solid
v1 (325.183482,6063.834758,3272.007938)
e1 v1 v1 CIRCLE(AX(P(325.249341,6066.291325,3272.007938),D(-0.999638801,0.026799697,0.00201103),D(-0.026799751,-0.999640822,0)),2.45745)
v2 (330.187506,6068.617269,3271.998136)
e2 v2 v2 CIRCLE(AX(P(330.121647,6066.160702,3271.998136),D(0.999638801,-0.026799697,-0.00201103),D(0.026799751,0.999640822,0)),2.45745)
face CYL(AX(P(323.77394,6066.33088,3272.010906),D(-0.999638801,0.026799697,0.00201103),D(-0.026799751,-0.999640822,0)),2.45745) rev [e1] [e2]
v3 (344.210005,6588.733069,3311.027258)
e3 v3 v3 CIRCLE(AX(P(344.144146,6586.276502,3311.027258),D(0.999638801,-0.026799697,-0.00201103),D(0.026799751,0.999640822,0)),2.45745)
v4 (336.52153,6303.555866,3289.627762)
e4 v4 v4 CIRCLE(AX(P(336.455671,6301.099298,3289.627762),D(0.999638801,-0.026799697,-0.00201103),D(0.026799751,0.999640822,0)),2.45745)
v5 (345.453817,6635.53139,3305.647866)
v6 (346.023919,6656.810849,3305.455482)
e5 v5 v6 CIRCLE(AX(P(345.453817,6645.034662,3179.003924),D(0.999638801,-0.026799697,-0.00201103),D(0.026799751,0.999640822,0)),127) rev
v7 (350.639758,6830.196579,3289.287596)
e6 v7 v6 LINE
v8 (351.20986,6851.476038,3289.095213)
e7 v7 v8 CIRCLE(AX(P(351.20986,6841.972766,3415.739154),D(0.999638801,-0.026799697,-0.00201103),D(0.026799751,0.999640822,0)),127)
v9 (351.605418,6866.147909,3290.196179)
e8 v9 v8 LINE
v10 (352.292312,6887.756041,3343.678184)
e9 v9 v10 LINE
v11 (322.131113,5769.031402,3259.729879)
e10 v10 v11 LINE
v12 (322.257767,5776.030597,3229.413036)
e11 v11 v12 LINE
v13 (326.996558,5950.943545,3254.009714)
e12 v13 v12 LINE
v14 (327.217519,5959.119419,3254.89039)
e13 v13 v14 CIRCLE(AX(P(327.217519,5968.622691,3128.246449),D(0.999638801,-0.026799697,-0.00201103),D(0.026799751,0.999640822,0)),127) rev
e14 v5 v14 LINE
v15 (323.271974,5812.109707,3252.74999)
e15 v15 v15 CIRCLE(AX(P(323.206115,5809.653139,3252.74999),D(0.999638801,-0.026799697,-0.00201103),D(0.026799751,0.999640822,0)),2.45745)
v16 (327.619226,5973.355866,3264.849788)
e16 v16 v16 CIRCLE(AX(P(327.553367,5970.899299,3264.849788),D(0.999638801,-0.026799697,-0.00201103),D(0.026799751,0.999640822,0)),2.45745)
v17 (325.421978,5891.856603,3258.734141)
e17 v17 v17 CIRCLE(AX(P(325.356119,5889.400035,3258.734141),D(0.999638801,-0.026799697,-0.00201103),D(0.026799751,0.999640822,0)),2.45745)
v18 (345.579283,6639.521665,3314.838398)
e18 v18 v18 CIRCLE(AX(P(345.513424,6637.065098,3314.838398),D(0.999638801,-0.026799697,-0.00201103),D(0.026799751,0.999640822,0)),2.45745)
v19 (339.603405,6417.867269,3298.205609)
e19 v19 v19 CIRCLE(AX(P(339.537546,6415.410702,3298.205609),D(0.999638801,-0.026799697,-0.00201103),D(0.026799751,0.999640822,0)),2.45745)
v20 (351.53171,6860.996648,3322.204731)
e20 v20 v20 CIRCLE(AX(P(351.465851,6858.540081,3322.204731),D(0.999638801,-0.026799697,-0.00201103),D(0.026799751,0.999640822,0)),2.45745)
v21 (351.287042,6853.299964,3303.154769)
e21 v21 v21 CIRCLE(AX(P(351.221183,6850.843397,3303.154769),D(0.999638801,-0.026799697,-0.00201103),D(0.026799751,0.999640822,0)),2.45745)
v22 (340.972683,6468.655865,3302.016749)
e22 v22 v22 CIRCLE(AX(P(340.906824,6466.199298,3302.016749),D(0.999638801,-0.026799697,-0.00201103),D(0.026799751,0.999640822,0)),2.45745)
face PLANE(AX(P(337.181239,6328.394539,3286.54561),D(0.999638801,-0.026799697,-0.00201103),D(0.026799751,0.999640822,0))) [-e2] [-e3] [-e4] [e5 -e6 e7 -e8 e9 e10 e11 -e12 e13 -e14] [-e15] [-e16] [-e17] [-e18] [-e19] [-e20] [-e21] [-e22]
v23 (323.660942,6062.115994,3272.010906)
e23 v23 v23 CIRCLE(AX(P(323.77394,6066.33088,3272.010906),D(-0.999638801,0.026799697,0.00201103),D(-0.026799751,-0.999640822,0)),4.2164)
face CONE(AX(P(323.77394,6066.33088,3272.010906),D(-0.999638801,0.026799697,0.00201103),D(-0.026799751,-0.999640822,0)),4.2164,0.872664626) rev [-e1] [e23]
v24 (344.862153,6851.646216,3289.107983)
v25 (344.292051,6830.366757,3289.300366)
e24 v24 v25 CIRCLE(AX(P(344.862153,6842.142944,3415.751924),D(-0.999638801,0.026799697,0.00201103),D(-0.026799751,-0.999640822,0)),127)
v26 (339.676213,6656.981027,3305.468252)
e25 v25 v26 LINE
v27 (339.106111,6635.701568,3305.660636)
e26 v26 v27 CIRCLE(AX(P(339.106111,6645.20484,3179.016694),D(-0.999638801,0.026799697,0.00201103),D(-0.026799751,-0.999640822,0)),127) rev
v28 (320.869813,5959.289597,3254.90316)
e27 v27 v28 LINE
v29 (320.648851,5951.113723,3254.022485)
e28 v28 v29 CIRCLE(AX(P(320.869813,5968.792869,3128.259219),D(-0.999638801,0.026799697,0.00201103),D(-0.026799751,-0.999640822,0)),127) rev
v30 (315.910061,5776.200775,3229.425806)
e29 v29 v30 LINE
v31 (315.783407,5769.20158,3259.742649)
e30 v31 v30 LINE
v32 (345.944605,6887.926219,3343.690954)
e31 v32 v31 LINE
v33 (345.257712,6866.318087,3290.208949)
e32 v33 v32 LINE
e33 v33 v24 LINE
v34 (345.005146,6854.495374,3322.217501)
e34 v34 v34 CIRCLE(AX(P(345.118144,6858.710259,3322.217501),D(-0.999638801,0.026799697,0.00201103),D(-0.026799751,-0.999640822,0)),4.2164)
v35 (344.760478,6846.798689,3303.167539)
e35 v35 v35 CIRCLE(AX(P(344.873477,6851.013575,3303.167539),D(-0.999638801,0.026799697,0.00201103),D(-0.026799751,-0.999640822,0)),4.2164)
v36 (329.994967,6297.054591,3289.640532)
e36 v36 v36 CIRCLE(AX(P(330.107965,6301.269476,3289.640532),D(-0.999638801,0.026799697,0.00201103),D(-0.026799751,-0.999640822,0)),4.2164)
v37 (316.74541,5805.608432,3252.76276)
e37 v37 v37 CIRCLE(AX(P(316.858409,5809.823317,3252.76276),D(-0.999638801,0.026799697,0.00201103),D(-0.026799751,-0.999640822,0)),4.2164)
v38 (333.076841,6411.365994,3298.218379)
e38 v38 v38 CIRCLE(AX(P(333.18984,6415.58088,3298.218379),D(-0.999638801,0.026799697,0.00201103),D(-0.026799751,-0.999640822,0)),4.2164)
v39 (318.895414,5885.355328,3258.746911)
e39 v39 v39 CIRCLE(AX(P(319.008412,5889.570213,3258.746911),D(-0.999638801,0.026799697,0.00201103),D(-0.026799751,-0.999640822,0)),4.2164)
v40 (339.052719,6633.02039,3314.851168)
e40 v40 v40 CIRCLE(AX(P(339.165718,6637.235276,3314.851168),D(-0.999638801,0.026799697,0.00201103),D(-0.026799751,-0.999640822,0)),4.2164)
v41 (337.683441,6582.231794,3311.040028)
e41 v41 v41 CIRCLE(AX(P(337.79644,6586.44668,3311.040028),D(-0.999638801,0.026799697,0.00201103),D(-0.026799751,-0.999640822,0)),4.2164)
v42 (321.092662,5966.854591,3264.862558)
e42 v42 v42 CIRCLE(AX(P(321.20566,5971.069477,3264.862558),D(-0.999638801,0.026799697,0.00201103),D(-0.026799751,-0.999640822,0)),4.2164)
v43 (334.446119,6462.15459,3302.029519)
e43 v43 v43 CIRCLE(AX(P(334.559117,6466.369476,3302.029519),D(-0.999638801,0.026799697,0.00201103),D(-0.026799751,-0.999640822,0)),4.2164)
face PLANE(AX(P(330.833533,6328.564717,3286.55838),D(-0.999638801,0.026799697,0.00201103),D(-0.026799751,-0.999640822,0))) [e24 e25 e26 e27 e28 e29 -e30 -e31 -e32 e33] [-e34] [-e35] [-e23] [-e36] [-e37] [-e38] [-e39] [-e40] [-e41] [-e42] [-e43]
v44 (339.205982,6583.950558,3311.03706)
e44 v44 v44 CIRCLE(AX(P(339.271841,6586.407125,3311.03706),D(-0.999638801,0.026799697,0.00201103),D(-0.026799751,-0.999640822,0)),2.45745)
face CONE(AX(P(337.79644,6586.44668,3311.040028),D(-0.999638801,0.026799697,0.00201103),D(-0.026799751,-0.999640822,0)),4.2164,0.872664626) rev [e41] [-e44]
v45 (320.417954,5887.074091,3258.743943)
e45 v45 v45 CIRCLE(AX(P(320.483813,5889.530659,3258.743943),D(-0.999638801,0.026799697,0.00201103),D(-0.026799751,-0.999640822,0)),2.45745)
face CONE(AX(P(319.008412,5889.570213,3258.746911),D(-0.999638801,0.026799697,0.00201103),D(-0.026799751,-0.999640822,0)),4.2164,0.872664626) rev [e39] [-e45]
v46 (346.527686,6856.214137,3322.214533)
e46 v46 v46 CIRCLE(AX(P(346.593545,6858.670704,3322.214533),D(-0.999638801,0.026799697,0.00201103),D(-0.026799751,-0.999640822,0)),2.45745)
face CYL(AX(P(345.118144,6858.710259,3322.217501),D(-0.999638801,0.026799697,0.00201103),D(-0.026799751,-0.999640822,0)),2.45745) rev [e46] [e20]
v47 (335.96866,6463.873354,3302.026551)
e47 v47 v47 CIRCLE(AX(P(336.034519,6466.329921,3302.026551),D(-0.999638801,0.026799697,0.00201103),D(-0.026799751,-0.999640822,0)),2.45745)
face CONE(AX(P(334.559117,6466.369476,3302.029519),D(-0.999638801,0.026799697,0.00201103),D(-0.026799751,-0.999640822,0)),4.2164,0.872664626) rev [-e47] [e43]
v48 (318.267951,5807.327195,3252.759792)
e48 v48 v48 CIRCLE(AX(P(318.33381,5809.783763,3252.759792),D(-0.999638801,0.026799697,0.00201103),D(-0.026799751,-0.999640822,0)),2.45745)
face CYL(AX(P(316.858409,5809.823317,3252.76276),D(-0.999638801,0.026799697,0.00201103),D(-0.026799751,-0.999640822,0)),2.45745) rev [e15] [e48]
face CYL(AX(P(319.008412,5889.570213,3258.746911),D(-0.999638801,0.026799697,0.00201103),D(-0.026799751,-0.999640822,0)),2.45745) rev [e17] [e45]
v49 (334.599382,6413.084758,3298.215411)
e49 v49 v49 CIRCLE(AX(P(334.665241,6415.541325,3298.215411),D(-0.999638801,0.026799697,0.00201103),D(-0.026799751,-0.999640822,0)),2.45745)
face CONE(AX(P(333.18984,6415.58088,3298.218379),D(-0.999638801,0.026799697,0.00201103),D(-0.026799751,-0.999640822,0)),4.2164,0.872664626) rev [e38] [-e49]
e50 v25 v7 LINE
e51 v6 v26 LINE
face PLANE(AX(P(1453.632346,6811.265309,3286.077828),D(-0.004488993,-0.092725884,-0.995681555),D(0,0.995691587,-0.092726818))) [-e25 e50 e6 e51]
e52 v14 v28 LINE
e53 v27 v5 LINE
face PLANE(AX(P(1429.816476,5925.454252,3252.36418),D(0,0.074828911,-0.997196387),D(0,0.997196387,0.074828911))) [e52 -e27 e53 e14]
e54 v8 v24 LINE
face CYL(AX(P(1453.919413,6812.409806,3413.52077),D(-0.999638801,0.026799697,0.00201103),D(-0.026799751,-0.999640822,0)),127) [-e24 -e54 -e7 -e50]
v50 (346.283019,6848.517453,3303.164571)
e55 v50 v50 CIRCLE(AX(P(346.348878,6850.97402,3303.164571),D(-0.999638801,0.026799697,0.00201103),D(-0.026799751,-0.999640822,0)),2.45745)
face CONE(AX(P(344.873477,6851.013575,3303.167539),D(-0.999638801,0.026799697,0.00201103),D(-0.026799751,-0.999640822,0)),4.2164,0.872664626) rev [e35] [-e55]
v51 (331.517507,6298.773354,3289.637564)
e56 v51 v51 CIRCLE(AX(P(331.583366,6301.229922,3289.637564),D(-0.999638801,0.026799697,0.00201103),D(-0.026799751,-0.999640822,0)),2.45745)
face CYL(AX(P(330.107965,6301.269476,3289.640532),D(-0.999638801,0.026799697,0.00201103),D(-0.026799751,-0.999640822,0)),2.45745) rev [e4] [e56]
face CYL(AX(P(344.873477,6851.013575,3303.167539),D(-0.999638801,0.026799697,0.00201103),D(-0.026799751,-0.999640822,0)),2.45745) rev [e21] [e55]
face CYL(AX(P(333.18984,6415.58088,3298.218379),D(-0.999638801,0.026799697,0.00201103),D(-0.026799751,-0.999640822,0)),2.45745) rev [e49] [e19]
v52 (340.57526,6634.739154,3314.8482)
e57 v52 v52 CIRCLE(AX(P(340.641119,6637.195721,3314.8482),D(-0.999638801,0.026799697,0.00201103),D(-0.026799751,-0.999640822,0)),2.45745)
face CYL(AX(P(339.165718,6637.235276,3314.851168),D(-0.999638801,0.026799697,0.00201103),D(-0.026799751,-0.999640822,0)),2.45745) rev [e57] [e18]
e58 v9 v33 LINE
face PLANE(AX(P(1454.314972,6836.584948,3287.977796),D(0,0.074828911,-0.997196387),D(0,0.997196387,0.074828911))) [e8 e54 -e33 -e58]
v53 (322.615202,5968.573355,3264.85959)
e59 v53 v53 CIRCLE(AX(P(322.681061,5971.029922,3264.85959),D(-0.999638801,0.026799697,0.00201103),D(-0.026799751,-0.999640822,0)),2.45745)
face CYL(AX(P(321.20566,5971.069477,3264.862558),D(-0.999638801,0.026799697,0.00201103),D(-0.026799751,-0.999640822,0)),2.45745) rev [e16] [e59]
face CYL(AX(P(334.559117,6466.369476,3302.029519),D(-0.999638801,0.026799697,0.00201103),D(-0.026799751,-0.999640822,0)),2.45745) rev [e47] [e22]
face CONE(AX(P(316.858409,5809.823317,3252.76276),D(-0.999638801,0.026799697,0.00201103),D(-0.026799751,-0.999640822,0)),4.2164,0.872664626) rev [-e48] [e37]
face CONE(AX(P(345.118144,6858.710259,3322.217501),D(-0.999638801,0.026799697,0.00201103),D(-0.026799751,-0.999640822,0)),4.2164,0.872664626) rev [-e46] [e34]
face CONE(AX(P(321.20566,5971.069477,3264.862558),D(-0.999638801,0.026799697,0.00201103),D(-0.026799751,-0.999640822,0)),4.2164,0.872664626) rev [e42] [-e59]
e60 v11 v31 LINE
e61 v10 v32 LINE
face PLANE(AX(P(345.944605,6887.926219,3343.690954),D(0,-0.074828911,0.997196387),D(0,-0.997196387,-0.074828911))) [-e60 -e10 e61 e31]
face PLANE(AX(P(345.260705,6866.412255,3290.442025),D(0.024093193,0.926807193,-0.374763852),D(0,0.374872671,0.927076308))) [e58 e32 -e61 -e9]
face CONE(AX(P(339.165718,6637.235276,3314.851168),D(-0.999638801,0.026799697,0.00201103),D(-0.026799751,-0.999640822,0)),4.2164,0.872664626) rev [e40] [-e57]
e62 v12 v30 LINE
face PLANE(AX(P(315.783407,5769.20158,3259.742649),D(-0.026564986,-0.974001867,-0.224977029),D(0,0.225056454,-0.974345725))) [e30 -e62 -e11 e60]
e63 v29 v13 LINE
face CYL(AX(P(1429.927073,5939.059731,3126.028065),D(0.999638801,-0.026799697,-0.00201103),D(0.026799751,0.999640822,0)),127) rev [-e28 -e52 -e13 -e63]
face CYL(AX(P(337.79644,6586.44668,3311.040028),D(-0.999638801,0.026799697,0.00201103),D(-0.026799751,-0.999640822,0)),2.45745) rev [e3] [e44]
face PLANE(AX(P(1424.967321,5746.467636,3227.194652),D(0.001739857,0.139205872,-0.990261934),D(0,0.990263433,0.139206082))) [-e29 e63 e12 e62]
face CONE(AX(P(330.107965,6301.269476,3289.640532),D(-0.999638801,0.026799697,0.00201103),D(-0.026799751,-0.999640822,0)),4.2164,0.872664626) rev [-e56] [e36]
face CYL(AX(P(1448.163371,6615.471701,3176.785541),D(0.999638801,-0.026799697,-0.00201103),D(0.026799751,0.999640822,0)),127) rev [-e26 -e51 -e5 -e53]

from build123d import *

# Parameters (mm, degrees)
STOCK_LEFT_START                                  = 154.501049255
STOCK_LEFT_CONSOLE_1_OUTLINE_R                    = 2.413
STOCK_LEFT_CONSOLE_1_DEPTH                        = 6.35
SKETCH1_R                                         = 2.413
BOSS_EXTRUDE1_DEPTH                               = 6.35
FILLET1_R                                         = 127
CSK_FOR_8_FLAT_HEAD_MACHINE_SCREW_100_D           = 4.9149
CSK_FOR_8_FLAT_HEAD_MACHINE_SCREW_100_DEPTH       = 36.56137815
CSK_FOR_8_FLAT_HEAD_MACHINE_SCREW_100_CSINK_D     = 8.4328
CSK_FOR_8_FLAT_HEAD_MACHINE_SCREW_100_CSINK_ANGLE = 100


# Read off the part's stored shape, not the designer's step: Stock-Left Console-1
with BuildPart() as part:
    # Stock-Left Console-1 outline → Stock-Left Console-1 (new body)
    with BuildSketch(Plane(origin=(0, 0, 0), x_dir=(0.02679964301193732, 0.9996408236099973, -5.391436833640836e-05), z_dir=(0.999638800759929, -0.0267996972431853, -0.00201103031422956)).offset(STOCK_LEFT_START)):
        Polygon((6894.543157626, 3344.380142713), (5775.416554865, 3260.371330561), (5781.349946418, 3234.680487062), (5961.468932714, 3260.009915697), (6652.879217668, 3311.911600999), (6881.420614343, 3311.911600999), align=None)
        with Locations((5816.052887601, 3253.393618776)):
            Circle(STOCK_LEFT_CONSOLE_1_OUTLINE_R, mode=Mode.SUBTRACT)
        with Locations((5895.828437121, 3259.382082581)):
            Circle(STOCK_LEFT_CONSOLE_1_OUTLINE_R, mode=Mode.SUBTRACT)
        with Locations((5977.356983496, 3265.50213756)):
            Circle(STOCK_LEFT_CONSOLE_1_OUTLINE_R, mode=Mode.SUBTRACT)
        with Locations((6072.652614823, 3272.65563813)):
            Circle(STOCK_LEFT_CONSOLE_1_OUTLINE_R, mode=Mode.SUBTRACT)
        with Locations((6307.675625814, 3290.29797094)):
            Circle(STOCK_LEFT_CONSOLE_1_OUTLINE_R, mode=Mode.SUBTRACT)
        with Locations((6422.028102237, 3298.882000385)):
            Circle(STOCK_LEFT_CONSOLE_1_OUTLINE_R, mode=Mode.SUBTRACT)
        with Locations((6472.834946762, 3302.695887614)):
            Circle(STOCK_LEFT_CONSOLE_1_OUTLINE_R, mode=Mode.SUBTRACT)
        with Locations((6592.955295229, 3311.712890485)):
            Circle(STOCK_LEFT_CONSOLE_1_OUTLINE_R, mode=Mode.SUBTRACT)
        with Locations((6643.762139775, 3315.526777715)):
            Circle(STOCK_LEFT_CONSOLE_1_OUTLINE_R, mode=Mode.SUBTRACT)
        with Locations((6865.316700097, 3322.905070324)):
            Circle(STOCK_LEFT_CONSOLE_1_OUTLINE_R, mode=Mode.SUBTRACT)
    extrude(amount=STOCK_LEFT_CONSOLE_1_DEPTH)

    # Sketch1 → Boss-Extrude1 (add)
    with BuildSketch(Plane(origin=(154.445243594, -4.140581344, -0.310706294), x_dir=(0.002010307996697838, -5.389511255073478e-05, 0.9999979778764931), z_dir=(-0.9996388007599293, 0.026799697243176115, 0.0020110303142280403))):
        Polygon((3259.688501477, 5961.644685781), (3234.3687839, 5781.524334123), (3229.743043385, 5782.592402631), (3254.912621388, 5961.644685781), (3306.77702959, 6653.057767982), (3288.626337955, 6847.775838873), (3290.526309625, 6873.104678319), (3311.540587989, 6881.599164324), (3311.552909679, 6653.057767982), align=None)
        with Locations(Location((3303.484925533, 6857.795366229, 0), (0, 0, 270))):
            Circle(SKETCH1_R, mode=Mode.SUBTRACT)
    extrude(amount=-BOSS_EXTRUDE1_DEPTH)

    # Fillet1
    # the kernel refuses this fillet: 127 mm, written as the material it adds along each edge
    with BuildSketch(Plane(origin=(320.759216191, 5955.187389877, 3254.595333259), x_dir=(-0.026818667254060527, -0.9899007533718392, -0.13920221823153914), z_dir=(0.9996388007599292, -0.026799697243176112, -0.00201103031422804))) as fillet1_piece_1:
        with BuildLine():
            CenterArc((FILLET1_R * 0.0324033639177, FILLET1_R), FILLET1_R, 266.288146769, 3.711853231)
            Line((-FILLET1_R * 0.0323353896511, FILLET1_R * 0.00209775339147), (0, 0))
            Line((0, 0), (FILLET1_R * 0.0324033639177, 0))
        make_face()
    extrude(amount=6.35)
    with BuildSketch(Plane(origin=(339.393178368, 6646.349336581, 3306.459636585), x_dir=(-0.02687504446974266, -0.9968362003292489, -0.07480188298361883), z_dir=(0.9996388007599292, -0.026799697243176112, -0.00201103031422804))) as fillet1_piece_2:
        with BuildLine():
            CenterArc((FILLET1_R * 0.0841067955983, FILLET1_R), FILLET1_R, 260.38470128, 9.61529872)
            Line((-FILLET1_R * 0.0829252189667, FILLET1_R * 0.0140485275074), (0, 0))
            Line((0, 0), (FILLET1_R * 0.0841067955983, 0))
        make_face()
    extrude(amount=6.35)
    # the kernel refuses this fillet: 127 mm, written as the material it takes off along each edge
    with BuildSketch(Plane(origin=(317.880823616, 6841.714103927, 3288.36268402), x_dir=(0.026875044469742655, 0.996836200329251, 0.0748018829835892), z_dir=(0.9996388007599292, -0.026799697243176112, -0.00201103031422804))) as fillet1_2_piece_1:
        with BuildLine():
            CenterArc((FILLET1_R * 0.0841067955983, FILLET1_R), FILLET1_R, 260.38470128, 9.61529872)
            Line((-FILLET1_R * 0.0829252189667, FILLET1_R * 0.0140485275074), (0, 0))
            Line((0, 0), (FILLET1_R * 0.0841067955982, 0))
        make_face()
    extrude(amount=59.757815205, mode=Mode.SUBTRACT)

    # CSK for #8 Flat Head Machine Screw (100)1
    with Locations(Plane(origin=(154.445243594, -4.140581344, -0.310706294), x_dir=(0.002010307996697838, -5.389511255073478e-05, 0.9999979778764931), z_dir=(-0.9996388007599293, 0.026799697243176115, 0.0020110303142280403))):
        with Locations((3322.534925533, 6865.49584281), (3303.484925533, 6857.795366229), (3315.168577933, 6643.940885012), (3311.357429933, 6593.133834917), (3302.346903301, 6473.013000478), (3298.535755302, 6422.205950402), (3289.957891123, 6307.853011342), (3272.328229482, 6072.829049515), (3265.179866736, 5977.533032649), (3259.064207335, 5896.004156434), (3253.080044595, 5816.228284164)):
            CounterSinkHole(CSK_FOR_8_FLAT_HEAD_MACHINE_SCREW_100_D / 2, CSK_FOR_8_FLAT_HEAD_MACHINE_SCREW_100_CSINK_D / 2, depth=CSK_FOR_8_FLAT_HEAD_MACHINE_SCREW_100_DEPTH, counter_sink_angle=CSK_FOR_8_FLAT_HEAD_MACHINE_SCREW_100_CSINK_ANGLE)


solid = part.part
